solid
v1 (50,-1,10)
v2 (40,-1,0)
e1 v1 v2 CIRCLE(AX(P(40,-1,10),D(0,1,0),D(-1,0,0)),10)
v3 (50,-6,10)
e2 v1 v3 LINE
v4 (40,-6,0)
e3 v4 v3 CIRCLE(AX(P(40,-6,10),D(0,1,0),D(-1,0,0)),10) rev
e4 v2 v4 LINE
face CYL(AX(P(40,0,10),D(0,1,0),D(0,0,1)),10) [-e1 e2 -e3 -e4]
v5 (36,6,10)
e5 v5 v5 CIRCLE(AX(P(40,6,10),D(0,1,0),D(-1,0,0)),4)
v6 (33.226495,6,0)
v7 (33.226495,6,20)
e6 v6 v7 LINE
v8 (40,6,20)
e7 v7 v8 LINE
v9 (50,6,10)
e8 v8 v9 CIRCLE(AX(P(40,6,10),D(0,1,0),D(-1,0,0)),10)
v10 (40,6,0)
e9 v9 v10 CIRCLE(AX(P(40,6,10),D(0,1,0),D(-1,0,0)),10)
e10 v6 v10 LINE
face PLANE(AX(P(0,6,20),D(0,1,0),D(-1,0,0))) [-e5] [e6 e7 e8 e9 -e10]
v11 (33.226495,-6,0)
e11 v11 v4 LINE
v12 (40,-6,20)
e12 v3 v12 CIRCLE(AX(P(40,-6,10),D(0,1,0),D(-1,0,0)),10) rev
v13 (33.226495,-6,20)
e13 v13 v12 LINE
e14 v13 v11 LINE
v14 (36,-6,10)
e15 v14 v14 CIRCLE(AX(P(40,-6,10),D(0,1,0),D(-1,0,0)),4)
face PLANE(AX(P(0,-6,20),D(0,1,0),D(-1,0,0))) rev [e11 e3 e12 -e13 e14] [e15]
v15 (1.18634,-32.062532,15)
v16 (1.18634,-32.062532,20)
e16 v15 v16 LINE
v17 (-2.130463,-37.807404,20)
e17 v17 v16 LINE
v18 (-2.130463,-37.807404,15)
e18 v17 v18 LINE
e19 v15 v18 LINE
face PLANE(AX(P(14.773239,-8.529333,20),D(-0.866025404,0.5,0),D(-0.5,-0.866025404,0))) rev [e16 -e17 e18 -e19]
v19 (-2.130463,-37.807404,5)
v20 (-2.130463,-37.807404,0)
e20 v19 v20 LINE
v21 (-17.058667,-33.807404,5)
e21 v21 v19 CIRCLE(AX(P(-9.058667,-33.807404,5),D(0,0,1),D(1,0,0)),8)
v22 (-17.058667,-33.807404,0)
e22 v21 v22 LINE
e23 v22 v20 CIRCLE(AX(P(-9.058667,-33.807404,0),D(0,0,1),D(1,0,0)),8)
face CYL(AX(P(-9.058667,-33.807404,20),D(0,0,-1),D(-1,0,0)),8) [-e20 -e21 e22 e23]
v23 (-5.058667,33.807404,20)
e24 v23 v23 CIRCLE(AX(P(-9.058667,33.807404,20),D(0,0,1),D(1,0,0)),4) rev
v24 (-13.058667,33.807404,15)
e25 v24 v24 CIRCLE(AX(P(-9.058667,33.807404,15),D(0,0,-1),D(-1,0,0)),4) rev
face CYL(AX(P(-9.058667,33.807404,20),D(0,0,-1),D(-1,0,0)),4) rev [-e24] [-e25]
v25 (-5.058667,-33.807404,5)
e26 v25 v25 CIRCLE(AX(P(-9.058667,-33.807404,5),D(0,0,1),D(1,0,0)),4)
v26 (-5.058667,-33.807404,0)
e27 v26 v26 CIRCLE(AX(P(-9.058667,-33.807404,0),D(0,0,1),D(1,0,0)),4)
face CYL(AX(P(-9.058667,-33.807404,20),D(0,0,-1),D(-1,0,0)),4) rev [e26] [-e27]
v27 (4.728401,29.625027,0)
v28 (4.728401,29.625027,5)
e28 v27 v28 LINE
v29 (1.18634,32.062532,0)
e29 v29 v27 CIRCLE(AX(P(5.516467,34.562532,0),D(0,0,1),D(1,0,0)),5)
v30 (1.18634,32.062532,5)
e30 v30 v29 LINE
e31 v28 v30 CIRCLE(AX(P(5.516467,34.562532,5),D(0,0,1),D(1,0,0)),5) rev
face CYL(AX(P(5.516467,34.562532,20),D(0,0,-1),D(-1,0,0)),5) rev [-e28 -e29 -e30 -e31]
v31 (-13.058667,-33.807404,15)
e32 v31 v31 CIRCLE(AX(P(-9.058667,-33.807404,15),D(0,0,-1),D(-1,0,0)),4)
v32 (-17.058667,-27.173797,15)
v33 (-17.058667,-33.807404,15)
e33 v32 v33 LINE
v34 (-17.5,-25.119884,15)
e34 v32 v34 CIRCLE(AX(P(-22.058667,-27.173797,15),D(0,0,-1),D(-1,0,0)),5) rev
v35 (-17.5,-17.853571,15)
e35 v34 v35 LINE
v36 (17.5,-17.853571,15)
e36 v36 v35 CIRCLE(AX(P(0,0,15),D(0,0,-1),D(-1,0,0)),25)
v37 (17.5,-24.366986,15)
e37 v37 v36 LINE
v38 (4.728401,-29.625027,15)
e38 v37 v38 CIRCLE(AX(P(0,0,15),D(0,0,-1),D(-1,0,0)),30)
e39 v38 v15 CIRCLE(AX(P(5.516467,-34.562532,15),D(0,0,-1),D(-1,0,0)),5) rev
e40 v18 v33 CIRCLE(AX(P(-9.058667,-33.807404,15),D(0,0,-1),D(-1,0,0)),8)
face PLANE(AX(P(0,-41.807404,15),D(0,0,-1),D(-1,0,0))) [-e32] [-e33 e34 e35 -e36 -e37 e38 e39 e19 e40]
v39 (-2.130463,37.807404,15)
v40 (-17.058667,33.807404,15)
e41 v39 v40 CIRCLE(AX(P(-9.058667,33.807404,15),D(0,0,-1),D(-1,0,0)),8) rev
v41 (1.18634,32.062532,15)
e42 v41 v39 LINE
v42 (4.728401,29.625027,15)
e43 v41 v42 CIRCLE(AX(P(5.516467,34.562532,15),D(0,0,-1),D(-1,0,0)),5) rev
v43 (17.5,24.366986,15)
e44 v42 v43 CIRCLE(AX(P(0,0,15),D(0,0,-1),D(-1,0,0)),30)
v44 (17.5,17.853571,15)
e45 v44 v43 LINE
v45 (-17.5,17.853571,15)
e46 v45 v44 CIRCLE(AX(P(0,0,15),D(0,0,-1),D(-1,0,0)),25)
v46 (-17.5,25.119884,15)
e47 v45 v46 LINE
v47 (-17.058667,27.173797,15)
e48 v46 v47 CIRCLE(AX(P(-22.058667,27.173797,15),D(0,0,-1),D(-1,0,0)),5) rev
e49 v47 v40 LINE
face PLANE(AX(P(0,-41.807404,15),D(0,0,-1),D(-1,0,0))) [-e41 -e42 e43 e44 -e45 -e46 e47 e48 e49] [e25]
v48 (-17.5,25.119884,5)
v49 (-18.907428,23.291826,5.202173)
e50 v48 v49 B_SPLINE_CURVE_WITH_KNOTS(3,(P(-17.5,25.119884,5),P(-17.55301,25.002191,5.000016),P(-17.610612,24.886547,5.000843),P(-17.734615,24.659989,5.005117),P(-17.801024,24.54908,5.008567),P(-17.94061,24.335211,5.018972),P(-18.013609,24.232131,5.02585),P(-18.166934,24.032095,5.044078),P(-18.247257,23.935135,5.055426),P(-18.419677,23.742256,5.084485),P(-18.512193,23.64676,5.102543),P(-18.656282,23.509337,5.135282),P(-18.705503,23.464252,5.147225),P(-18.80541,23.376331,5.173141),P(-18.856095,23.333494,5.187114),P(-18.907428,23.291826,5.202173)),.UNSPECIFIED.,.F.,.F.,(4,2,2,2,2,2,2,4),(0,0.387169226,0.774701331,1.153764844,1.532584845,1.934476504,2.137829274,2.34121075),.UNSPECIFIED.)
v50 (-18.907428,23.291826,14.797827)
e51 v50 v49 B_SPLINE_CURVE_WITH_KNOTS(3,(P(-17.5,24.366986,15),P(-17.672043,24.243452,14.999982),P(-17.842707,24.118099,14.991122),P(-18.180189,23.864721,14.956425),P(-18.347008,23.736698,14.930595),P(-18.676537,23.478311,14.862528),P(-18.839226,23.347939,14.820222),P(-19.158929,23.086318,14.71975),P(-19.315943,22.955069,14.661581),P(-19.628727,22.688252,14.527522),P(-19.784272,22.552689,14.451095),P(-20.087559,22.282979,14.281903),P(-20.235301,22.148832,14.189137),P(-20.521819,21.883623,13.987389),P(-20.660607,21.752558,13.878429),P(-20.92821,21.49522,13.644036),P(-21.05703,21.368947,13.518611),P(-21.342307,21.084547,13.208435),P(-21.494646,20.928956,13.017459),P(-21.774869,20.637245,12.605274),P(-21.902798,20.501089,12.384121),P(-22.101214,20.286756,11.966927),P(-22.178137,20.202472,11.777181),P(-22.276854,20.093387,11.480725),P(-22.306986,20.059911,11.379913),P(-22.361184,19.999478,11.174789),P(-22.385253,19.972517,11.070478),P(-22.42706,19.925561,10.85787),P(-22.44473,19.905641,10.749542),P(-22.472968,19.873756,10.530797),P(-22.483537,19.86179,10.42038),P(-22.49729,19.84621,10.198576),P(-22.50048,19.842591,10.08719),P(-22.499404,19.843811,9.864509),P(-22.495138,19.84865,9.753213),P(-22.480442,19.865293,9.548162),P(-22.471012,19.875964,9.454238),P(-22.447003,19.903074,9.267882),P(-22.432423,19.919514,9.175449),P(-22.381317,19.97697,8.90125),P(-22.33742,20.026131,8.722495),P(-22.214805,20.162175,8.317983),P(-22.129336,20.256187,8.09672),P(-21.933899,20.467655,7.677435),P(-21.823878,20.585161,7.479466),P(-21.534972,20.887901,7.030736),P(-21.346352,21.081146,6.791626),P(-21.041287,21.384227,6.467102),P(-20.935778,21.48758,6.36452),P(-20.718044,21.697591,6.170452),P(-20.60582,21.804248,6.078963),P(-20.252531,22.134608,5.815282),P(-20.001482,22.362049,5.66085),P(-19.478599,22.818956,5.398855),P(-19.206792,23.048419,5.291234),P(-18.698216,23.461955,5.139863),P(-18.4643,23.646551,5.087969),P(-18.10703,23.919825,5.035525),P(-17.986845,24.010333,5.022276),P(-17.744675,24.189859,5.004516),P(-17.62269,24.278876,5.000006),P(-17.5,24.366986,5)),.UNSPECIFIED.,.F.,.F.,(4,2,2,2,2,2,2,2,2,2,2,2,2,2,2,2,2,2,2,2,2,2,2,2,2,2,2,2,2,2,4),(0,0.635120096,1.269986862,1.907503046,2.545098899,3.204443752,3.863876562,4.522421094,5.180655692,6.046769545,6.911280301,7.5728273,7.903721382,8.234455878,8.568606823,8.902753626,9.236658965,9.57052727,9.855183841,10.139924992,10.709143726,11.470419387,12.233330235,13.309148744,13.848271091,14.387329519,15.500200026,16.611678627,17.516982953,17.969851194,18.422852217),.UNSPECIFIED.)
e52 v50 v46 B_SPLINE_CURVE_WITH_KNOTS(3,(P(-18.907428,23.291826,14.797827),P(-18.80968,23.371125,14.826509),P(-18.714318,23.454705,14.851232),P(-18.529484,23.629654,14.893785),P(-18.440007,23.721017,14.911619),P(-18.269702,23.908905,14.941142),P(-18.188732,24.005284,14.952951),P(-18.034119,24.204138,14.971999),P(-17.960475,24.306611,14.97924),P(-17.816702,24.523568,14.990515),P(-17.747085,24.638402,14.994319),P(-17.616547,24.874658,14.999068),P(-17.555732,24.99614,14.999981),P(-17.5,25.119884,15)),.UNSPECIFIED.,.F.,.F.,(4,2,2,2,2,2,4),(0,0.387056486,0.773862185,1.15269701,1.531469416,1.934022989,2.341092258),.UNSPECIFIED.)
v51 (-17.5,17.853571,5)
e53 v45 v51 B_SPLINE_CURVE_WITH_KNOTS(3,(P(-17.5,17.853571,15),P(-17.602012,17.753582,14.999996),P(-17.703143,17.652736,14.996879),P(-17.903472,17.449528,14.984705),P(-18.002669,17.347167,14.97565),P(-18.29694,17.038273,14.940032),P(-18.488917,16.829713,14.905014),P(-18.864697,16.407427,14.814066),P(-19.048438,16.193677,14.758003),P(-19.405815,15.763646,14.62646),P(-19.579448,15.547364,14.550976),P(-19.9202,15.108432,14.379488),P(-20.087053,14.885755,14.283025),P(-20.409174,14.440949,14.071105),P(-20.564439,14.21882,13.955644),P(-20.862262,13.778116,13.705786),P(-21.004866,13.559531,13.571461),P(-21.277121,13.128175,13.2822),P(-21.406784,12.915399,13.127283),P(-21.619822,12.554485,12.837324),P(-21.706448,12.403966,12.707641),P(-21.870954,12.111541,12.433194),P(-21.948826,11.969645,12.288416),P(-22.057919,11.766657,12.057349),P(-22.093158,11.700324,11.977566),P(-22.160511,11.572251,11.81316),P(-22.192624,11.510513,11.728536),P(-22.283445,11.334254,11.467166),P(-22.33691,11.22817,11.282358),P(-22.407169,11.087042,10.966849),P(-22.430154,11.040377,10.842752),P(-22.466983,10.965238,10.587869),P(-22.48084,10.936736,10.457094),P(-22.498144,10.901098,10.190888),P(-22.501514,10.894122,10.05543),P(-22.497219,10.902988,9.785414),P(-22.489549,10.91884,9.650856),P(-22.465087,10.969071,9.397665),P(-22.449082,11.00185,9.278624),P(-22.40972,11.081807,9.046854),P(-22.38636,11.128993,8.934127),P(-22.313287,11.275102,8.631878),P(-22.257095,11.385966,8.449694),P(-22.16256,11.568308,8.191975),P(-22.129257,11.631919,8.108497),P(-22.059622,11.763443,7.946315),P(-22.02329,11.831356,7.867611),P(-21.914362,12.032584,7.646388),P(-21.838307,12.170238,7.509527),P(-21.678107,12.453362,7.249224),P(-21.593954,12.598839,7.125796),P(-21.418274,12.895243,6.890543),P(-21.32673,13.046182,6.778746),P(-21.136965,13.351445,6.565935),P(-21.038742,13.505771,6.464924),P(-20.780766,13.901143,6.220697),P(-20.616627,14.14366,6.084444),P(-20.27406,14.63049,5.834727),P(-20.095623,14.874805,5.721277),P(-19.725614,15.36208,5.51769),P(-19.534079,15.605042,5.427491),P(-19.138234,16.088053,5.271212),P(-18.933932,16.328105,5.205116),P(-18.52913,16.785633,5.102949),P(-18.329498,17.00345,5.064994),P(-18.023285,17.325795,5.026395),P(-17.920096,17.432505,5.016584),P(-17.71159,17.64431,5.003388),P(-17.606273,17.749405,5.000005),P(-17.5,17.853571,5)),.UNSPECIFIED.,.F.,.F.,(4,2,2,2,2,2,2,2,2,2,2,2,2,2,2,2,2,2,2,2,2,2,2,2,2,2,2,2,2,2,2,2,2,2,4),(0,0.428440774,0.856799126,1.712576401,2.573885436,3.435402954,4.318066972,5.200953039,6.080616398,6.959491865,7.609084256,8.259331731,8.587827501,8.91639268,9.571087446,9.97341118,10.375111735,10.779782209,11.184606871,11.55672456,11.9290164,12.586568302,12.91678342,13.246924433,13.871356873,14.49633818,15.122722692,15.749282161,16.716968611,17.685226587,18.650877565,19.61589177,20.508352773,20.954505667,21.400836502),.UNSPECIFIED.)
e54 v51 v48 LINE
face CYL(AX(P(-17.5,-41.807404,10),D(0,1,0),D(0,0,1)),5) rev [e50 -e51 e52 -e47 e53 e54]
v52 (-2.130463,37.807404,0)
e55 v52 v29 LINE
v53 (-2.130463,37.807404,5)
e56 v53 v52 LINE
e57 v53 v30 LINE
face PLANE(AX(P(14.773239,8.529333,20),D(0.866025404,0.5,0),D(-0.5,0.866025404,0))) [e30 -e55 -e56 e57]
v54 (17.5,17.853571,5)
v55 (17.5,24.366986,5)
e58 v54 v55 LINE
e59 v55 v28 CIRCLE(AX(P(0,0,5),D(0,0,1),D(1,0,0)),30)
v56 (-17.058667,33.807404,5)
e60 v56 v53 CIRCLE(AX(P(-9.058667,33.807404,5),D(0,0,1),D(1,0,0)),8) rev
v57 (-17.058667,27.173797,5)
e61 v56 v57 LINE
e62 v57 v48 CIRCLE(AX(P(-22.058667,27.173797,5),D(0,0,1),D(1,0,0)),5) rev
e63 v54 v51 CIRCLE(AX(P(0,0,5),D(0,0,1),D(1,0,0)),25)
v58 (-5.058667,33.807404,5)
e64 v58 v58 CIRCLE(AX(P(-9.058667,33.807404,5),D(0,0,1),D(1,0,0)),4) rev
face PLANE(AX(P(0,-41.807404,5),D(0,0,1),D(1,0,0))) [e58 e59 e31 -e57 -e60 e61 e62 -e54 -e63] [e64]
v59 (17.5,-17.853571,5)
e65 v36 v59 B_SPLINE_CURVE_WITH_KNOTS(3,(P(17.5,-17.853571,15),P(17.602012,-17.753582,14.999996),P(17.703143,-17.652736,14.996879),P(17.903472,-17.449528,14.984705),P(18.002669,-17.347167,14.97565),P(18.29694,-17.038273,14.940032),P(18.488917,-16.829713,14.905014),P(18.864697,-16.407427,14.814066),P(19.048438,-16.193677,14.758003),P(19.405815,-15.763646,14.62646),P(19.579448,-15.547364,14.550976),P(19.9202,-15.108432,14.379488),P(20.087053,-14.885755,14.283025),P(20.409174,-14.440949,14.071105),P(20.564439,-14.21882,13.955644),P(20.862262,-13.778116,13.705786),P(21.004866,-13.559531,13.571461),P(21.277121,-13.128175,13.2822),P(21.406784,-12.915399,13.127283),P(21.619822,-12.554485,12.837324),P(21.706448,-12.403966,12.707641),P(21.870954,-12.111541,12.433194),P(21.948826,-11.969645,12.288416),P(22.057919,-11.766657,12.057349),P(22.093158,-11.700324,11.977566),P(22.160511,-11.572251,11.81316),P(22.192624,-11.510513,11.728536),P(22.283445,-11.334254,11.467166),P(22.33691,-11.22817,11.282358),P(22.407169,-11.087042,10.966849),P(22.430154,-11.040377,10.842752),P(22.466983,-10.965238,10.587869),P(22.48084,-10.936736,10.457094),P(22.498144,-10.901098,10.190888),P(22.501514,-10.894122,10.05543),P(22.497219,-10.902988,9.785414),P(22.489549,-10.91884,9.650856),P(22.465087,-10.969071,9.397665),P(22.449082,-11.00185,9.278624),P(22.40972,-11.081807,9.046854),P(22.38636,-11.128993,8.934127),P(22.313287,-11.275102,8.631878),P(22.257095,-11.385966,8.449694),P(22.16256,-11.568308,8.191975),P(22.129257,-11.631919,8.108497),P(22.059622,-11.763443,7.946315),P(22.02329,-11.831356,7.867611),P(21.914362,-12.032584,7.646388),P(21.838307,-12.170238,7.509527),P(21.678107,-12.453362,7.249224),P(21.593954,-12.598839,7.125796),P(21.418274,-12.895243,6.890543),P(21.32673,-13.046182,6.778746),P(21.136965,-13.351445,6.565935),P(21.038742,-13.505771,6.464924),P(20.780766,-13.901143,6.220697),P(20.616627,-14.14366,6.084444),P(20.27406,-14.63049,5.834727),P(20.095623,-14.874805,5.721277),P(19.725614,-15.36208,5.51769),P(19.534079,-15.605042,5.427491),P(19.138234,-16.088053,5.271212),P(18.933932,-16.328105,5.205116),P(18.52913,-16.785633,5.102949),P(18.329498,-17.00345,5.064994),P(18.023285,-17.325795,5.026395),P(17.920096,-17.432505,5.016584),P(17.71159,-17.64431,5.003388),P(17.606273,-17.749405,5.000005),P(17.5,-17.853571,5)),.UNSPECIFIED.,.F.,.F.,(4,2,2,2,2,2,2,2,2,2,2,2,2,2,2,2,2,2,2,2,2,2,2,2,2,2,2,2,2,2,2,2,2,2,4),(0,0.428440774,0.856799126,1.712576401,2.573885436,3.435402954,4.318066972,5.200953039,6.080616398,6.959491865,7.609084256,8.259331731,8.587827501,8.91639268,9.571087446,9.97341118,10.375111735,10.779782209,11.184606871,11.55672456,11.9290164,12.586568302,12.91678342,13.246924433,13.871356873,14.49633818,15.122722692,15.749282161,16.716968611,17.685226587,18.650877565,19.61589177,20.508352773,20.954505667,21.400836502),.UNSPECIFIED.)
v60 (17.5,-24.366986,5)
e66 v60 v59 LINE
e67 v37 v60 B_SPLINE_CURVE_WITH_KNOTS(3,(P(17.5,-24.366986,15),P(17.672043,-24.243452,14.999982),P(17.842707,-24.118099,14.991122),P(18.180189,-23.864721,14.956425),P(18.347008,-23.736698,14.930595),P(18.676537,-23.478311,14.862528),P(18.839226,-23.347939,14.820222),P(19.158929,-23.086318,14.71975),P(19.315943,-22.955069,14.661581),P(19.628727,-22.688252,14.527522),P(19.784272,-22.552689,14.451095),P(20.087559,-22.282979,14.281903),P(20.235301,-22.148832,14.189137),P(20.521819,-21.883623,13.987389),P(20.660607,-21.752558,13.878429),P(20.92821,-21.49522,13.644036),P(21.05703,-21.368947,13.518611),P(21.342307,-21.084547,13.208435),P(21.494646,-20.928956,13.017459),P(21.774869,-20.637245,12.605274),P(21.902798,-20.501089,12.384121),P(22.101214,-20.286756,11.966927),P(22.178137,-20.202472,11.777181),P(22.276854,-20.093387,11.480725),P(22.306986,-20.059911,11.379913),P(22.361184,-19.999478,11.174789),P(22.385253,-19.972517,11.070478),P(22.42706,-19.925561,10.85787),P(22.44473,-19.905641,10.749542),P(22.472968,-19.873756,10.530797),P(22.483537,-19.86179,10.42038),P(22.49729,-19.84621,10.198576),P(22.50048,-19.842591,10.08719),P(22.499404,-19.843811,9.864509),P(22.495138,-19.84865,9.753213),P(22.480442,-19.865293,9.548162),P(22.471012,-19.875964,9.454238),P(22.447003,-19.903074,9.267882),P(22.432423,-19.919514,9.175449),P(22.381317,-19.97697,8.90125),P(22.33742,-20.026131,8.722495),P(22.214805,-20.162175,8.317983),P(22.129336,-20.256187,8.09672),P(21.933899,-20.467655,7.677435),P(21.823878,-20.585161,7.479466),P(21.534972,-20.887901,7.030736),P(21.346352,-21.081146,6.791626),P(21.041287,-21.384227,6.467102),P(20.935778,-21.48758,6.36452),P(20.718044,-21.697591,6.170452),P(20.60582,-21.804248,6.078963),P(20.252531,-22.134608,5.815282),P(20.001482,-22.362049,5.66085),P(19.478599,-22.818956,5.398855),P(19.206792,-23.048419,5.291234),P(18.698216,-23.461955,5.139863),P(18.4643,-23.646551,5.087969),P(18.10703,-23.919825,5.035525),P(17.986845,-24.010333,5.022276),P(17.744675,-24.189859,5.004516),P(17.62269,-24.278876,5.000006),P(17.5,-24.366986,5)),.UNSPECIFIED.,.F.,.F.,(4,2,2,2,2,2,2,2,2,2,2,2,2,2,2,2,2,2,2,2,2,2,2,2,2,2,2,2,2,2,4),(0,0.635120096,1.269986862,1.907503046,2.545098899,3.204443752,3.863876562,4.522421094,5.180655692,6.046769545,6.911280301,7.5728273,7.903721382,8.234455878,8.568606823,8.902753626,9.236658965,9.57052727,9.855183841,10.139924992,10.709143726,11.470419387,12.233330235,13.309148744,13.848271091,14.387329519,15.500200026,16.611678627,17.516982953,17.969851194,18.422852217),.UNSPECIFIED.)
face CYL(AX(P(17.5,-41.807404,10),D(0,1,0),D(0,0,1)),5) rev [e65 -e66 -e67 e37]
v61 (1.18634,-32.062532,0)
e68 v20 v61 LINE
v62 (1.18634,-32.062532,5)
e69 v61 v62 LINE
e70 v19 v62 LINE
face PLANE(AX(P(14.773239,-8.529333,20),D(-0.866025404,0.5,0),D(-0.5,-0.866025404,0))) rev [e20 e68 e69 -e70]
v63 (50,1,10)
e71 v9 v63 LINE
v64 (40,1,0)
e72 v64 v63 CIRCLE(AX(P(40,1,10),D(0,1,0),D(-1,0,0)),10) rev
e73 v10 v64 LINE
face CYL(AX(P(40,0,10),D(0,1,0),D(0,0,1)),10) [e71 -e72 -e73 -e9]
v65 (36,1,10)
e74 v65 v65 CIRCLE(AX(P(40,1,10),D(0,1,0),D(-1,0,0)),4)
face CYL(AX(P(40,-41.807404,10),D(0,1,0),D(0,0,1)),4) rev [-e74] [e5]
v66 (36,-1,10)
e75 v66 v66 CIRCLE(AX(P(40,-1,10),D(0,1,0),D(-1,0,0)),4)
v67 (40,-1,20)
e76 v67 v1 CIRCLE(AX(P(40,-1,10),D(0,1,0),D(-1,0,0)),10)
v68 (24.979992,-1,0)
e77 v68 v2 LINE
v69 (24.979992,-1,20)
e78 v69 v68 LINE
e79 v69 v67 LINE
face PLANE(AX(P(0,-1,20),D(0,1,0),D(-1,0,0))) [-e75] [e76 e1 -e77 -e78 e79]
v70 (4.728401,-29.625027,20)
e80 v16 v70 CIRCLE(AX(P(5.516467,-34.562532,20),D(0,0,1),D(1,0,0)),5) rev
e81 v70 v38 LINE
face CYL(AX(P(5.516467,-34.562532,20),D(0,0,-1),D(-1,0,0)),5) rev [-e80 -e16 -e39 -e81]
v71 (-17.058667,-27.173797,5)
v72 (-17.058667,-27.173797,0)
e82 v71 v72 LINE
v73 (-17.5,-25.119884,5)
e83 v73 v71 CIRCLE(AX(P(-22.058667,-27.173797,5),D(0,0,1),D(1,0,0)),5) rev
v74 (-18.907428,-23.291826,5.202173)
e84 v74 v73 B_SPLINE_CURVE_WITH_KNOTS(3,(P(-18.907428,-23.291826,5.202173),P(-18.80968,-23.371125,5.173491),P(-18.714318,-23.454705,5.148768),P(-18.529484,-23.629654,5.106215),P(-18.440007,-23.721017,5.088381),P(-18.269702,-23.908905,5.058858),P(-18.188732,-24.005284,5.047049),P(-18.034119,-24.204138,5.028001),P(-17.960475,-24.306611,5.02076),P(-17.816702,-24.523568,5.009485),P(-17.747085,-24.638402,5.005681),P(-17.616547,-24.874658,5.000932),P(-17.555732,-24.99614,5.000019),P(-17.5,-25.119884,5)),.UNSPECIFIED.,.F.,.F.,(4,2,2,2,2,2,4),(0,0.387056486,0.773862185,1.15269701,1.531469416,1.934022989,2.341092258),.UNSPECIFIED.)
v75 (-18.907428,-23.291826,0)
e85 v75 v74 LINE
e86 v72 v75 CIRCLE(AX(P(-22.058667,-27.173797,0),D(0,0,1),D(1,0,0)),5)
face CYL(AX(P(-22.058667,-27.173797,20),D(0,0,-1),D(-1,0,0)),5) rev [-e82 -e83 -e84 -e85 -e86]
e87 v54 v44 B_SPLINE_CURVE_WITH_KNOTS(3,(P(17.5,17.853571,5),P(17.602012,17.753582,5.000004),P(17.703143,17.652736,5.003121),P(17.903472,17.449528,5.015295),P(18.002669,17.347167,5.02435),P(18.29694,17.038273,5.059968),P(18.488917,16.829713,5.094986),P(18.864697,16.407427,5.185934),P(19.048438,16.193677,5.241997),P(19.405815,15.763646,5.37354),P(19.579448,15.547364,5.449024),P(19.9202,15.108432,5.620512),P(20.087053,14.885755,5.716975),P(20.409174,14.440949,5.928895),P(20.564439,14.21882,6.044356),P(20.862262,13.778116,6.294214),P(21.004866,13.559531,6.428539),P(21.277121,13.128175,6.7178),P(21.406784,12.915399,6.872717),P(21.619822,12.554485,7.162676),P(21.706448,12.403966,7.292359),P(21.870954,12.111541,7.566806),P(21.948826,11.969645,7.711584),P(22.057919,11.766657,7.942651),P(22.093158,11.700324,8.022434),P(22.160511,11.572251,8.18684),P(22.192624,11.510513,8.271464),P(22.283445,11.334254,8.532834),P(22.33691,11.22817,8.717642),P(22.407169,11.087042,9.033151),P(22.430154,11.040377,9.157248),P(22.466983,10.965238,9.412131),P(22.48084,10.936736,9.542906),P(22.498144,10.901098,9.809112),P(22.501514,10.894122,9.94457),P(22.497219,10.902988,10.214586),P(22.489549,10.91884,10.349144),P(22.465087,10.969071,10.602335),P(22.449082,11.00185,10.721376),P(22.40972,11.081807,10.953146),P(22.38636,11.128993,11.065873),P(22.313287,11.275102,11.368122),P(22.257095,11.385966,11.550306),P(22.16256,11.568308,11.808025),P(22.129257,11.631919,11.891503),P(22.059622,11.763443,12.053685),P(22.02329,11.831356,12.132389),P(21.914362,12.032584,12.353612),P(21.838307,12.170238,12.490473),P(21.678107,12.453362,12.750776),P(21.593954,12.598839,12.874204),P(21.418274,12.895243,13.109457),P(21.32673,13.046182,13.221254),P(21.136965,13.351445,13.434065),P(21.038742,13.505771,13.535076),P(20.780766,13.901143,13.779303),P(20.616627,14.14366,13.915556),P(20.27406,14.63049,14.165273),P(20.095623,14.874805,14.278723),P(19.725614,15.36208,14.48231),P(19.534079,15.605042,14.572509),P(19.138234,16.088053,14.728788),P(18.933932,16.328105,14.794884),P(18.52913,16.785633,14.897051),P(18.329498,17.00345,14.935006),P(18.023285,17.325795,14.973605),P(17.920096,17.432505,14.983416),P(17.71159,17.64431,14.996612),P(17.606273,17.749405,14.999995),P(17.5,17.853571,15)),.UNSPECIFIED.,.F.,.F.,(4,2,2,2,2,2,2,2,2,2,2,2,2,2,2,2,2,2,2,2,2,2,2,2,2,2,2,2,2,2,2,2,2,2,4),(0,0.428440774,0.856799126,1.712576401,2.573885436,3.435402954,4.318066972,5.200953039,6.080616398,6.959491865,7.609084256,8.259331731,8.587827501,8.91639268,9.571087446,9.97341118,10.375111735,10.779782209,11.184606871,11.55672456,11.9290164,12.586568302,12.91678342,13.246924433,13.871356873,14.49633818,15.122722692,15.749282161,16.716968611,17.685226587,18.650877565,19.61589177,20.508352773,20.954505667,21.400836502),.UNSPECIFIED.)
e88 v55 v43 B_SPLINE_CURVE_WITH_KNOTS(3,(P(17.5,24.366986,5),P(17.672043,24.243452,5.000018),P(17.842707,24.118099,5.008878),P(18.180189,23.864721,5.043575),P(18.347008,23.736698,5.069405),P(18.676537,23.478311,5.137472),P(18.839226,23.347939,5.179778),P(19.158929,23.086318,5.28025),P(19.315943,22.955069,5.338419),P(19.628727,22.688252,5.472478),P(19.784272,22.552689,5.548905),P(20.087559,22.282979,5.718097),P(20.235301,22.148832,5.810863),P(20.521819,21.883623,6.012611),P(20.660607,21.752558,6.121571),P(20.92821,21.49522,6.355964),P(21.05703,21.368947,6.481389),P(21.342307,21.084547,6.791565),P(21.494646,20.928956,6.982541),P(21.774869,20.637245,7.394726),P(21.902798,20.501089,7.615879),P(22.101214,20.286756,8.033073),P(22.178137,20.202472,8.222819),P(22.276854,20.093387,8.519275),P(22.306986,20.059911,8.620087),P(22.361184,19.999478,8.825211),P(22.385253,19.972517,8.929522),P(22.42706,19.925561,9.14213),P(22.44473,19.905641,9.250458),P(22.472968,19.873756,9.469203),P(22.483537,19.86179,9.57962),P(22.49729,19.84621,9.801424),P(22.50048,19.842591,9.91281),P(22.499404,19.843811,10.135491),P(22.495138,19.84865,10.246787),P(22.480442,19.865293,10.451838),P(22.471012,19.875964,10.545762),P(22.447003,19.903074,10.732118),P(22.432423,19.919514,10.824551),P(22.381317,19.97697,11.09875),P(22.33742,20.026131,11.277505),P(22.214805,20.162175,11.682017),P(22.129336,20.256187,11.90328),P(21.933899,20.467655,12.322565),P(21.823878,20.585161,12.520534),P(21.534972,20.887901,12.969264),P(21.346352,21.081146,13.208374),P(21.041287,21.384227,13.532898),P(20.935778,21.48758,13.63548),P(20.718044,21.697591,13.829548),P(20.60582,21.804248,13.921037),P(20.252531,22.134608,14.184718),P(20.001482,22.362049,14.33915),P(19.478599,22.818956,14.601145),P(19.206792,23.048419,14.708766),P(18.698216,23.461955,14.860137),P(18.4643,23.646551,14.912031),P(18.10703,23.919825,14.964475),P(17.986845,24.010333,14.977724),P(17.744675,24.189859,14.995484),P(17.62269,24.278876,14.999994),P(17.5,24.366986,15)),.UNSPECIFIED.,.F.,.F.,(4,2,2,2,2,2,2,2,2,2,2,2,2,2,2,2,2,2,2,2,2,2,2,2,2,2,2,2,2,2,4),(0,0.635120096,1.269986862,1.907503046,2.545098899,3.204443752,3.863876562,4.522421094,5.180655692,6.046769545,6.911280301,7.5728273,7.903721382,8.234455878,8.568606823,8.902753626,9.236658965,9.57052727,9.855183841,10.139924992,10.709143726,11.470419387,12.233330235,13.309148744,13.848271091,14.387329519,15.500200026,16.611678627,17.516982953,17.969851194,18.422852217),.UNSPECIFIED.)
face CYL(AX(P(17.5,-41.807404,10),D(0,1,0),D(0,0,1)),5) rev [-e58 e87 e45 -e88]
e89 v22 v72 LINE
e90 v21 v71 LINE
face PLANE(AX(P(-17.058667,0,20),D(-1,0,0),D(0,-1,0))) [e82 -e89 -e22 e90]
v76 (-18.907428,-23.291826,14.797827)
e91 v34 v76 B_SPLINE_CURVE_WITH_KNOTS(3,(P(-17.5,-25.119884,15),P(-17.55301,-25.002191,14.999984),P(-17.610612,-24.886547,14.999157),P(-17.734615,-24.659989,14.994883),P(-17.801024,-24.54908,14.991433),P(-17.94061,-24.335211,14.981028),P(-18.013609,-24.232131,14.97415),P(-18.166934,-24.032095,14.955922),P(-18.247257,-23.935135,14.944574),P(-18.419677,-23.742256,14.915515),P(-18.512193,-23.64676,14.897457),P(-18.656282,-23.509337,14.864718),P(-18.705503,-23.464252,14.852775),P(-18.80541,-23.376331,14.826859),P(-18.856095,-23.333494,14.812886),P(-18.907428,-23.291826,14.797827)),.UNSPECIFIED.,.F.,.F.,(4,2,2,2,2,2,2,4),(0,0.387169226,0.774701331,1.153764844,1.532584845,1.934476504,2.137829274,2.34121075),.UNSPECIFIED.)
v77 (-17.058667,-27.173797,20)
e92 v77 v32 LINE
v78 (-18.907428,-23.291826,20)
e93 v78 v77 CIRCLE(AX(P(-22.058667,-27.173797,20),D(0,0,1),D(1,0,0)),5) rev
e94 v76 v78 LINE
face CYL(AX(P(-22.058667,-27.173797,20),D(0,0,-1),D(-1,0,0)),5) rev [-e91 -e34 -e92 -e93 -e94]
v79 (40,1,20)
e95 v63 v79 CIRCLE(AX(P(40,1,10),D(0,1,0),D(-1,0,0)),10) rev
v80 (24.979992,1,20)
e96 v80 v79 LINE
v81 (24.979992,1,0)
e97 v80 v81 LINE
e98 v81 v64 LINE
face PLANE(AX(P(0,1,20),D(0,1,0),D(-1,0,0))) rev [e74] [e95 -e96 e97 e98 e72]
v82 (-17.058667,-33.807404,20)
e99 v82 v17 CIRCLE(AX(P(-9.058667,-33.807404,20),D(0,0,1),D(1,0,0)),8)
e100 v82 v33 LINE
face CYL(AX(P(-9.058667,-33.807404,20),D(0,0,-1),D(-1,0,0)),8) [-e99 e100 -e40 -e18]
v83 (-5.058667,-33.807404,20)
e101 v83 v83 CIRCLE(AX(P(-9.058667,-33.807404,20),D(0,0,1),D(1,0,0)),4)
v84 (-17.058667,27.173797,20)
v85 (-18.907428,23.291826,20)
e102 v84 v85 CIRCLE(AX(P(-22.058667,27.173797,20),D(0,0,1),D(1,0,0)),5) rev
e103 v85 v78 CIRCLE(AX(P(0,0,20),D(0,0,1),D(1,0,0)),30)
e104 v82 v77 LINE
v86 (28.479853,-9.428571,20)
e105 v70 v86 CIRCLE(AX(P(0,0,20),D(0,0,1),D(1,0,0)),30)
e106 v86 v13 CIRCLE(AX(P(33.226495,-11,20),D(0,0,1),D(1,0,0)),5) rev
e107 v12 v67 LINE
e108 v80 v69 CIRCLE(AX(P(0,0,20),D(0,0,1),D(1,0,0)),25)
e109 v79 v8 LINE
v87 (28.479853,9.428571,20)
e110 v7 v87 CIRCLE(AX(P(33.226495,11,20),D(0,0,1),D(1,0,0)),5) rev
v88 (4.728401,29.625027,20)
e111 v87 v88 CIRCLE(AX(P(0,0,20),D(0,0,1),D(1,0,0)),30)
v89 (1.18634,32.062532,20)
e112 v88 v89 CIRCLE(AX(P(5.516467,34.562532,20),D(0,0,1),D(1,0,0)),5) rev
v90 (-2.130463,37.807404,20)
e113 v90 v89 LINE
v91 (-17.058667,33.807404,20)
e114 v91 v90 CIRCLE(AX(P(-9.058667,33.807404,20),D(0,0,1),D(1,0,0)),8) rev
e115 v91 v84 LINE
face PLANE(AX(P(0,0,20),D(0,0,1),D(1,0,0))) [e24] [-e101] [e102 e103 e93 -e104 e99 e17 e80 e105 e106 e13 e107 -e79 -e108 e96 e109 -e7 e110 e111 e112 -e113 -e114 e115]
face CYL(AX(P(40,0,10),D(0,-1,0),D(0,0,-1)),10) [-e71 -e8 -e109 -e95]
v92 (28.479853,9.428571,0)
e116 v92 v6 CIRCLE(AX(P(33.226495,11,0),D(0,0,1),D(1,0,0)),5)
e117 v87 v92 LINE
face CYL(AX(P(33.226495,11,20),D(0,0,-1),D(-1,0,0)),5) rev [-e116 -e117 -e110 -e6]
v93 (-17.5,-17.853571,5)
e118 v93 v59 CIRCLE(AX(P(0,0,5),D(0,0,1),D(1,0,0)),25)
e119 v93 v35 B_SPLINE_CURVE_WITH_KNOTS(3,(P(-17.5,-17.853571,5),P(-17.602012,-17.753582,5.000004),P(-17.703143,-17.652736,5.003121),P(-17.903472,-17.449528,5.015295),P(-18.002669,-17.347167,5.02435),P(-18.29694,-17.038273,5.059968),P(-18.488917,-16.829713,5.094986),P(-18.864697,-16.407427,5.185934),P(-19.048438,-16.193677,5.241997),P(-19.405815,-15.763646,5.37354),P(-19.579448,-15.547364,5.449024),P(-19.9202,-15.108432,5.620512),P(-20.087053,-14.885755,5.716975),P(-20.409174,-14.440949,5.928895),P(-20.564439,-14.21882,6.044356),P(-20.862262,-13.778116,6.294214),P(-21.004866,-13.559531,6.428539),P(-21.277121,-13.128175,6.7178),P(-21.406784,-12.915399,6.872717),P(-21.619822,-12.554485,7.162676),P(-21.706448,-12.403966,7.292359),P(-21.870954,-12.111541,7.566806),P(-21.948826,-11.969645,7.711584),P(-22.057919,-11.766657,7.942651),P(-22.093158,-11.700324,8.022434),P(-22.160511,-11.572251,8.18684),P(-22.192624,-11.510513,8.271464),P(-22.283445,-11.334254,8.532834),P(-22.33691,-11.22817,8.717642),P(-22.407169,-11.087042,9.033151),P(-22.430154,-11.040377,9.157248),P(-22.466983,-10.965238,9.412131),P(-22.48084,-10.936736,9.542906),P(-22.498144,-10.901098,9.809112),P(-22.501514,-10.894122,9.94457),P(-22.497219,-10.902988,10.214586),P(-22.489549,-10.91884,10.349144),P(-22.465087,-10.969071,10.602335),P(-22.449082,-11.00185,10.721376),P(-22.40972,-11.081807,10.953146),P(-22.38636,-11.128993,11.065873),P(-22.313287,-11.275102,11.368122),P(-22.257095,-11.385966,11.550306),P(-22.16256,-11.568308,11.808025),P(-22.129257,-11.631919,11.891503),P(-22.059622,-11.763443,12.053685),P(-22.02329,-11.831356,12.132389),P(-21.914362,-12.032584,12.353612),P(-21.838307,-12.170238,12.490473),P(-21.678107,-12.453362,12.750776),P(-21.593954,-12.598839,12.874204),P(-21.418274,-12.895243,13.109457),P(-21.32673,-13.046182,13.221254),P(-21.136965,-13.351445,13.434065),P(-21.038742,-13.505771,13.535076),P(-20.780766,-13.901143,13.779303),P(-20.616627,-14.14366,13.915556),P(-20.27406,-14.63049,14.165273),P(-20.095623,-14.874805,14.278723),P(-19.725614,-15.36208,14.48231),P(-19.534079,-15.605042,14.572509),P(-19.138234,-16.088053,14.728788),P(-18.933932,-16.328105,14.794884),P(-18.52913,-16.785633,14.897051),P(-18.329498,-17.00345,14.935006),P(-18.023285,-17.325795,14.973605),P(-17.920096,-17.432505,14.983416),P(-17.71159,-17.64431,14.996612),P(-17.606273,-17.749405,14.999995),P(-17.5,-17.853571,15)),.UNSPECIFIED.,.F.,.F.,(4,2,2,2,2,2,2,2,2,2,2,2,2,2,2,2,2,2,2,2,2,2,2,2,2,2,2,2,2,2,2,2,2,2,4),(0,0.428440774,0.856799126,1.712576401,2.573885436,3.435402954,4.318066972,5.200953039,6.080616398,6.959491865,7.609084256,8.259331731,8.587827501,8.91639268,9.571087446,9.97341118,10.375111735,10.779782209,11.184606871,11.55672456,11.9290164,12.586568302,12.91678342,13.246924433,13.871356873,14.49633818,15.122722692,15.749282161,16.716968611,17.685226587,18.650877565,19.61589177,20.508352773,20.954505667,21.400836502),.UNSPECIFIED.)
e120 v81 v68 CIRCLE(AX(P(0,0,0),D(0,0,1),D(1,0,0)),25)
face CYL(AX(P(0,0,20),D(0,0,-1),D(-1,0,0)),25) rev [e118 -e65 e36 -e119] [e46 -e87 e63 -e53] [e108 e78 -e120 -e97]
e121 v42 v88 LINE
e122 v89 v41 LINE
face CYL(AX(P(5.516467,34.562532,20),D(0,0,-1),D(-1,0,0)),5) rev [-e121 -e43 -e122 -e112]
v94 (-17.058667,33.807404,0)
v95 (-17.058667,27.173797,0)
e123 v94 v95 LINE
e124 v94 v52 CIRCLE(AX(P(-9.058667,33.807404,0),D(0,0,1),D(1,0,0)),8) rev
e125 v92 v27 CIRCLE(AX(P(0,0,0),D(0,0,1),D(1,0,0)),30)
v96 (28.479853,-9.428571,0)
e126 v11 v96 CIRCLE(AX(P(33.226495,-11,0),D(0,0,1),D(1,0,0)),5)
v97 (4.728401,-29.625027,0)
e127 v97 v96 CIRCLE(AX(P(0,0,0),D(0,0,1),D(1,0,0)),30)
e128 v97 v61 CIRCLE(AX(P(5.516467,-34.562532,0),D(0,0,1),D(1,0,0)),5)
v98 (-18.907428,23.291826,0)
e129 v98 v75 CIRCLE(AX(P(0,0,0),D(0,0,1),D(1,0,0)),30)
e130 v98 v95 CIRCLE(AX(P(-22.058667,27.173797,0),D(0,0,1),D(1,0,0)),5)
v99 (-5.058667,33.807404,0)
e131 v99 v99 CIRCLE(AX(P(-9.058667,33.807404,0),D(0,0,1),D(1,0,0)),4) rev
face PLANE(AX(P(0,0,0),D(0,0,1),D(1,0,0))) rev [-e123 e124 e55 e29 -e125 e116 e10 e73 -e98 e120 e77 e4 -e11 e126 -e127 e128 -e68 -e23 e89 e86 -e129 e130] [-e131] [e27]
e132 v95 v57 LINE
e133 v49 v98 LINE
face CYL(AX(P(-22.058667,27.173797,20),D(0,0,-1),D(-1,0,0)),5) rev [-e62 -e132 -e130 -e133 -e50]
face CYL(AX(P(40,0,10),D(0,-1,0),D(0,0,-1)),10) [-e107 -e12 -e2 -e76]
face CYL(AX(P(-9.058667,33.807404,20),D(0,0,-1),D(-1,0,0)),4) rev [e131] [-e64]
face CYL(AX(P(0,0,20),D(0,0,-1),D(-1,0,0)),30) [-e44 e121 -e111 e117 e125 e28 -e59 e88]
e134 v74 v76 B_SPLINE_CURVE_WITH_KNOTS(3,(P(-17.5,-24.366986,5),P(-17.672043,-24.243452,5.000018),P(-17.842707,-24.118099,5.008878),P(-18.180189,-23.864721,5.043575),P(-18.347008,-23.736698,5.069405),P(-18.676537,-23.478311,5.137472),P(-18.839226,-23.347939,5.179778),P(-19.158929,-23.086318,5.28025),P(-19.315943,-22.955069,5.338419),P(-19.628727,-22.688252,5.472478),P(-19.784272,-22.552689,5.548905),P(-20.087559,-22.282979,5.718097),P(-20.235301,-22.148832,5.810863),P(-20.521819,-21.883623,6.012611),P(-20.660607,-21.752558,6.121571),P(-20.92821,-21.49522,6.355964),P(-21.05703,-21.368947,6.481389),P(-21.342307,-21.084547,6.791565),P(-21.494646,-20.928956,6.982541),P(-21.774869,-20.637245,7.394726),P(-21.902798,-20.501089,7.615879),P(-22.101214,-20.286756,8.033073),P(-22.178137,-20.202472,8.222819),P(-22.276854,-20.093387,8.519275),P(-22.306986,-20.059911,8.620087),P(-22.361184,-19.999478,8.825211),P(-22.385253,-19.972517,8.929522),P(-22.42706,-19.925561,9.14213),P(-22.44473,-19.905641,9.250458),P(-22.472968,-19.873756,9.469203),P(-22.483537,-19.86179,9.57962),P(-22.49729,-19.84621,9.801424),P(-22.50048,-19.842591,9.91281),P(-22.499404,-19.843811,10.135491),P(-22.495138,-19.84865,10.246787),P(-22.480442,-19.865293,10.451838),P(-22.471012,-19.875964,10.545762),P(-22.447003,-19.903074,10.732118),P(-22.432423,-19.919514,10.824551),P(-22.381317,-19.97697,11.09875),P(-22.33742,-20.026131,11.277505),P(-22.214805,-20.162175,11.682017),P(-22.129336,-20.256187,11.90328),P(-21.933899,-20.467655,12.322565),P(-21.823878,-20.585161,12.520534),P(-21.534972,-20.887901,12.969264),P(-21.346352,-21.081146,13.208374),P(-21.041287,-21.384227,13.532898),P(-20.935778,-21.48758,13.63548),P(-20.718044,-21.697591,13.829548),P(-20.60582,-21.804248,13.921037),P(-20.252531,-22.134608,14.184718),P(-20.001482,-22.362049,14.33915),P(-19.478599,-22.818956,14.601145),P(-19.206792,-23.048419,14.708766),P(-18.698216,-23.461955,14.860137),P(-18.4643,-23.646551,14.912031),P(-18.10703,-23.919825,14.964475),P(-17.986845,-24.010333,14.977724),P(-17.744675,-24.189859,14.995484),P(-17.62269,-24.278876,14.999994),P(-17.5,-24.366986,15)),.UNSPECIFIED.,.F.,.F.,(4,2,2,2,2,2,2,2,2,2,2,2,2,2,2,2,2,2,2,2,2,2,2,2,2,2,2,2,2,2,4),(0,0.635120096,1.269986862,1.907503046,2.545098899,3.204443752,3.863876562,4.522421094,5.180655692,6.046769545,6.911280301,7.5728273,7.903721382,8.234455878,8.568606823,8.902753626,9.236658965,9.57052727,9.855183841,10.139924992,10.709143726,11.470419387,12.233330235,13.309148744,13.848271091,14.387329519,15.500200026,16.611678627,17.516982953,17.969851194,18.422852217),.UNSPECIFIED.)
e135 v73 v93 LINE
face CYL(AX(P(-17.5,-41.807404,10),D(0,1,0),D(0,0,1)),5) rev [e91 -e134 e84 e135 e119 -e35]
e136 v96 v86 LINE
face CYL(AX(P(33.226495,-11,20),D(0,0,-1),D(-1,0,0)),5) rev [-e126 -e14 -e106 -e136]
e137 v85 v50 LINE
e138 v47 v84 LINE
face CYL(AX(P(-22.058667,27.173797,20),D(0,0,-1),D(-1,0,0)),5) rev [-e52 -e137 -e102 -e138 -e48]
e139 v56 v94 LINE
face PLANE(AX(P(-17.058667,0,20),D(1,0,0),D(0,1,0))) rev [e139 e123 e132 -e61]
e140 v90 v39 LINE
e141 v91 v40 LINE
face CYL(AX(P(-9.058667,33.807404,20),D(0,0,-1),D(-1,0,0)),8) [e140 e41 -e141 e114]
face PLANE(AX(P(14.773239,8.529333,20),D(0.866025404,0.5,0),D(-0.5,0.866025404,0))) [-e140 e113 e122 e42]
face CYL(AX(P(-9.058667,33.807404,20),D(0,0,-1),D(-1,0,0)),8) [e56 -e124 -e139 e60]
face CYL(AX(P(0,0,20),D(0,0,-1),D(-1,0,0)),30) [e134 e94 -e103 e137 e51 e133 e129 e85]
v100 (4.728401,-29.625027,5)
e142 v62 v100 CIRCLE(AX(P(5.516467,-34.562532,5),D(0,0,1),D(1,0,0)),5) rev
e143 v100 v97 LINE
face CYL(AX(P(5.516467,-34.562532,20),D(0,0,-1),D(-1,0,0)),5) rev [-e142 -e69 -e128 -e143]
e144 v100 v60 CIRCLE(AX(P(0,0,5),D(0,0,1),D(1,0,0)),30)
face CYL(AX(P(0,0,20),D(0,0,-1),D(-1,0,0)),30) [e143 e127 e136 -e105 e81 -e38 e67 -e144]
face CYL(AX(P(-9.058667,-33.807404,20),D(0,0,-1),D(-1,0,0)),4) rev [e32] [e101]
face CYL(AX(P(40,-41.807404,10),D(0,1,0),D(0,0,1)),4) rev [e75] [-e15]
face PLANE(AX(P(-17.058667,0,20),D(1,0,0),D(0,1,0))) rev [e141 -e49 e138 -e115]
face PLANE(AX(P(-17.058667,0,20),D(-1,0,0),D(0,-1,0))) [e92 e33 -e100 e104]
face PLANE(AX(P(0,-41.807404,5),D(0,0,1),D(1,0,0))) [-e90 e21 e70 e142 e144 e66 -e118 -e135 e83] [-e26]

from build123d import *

# Parameters (mm, degrees)
SKETCH1_R              = 4
BOSS_EXTRUDE1_DEPTH    = 20
FILLET1_R              = 10
CUT_EXTRUDE1_START     = -41.80740392
CUT_EXTRUDE1_OUTLINE_R = 4
CUT_EXTRUDE1_DEPTH     = 83.61480784
FILLET2_R              = 5


# Read off the part's stored shape, not the designer's step: Cut-Extrude1
with BuildPart() as part:
    # Sketch1 → Boss-Extrude1 (new body)
    with BuildSketch(Plane(origin=(0, 0, 0), x_dir=(0, 1, 0), z_dir=(0, 0, 1))):
        with BuildLine():
            ThreePointArc((24.677963744, 17.058666579), (0, 30), (-24.677963744, 17.058666579))
            Line((-24.677963744, 17.058666579), (-33.80740392, 17.058666579))
            ThreePointArc((-33.80740392, 17.058666579), (-41.534810495, 11.129219073), (-37.80740416, 2.130463487))
            Line((-37.80740416, 2.130463487), (-29.901076805, -2.43425674))
            ThreePointArc((-29.901076805, -2.43425674), (-22.448320849, -19.901580115), (-6, -29.393876913))
            Line((-6, -29.393876913), (-6, -50))
            Line((-6, -50), (-1, -50))
            Line((-1, -50), (-1, -24.979991994))
            ThreePointArc((-1, -24.979991994), (0, 25), (1, -24.979991994))
            Line((1, -24.979991994), (1, -50))
            Line((1, -50), (6, -50))
            Line((6, -50), (6, -29.393876913))
            ThreePointArc((6, -29.393876913), (22.448320849, -19.901580115), (29.901076805, -2.43425674))
            Line((29.901076805, -2.43425674), (37.807403702, 2.130463222))
            ThreePointArc((37.807403702, 2.130463222), (41.534810563, 11.129218818), (33.80740392, 17.058666579))
            Line((33.80740392, 17.058666579), (24.677963744, 17.058666579))
        make_face()
        with Locations(Location((-33.80740392, 9.058666579, 0), (0, 0, 270))):
            Circle(SKETCH1_R, mode=Mode.SUBTRACT)
        with Locations(Location((33.80740392, 9.058666579, 0), (0, 0, 270))):
            Circle(SKETCH1_R, mode=Mode.SUBTRACT)
    extrude(amount=BOSS_EXTRUDE1_DEPTH)

    # Fillet1
    fillet1_edges = [part.edges().sort_by_distance(p)[0] for p in [
        (50, 3.5, 0),
        (50, 3.5, 20),
        (50, -3.5, 0),
        (50, -3.5, 20),
    ]]
    fillet(fillet1_edges, radius=FILLET1_R - 0.0001)  # a hair under: the kernel refuses the full size

    # Cut-Extrude1 outline → Cut-Extrude1 (cut)
    with BuildSketch(Plane(origin=(0, 0, 0), x_dir=(-1, 0, 0), z_dir=(0, 1, 0)).offset(CUT_EXTRUDE1_START)):
        with BuildLine():
            ThreePointArc((17.5, 5), (22.5, 10), (17.5, 15))
            Line((17.5, 15), (-17.5, 15))
            ThreePointArc((-17.5, 15), (-22.5, 10), (-17.5, 5))
            Line((-17.5, 5), (17.5, 5))
        make_face()
        with Locations((-40, 10)):
            Circle(CUT_EXTRUDE1_OUTLINE_R)
    extrude(amount=CUT_EXTRUDE1_DEPTH, mode=Mode.SUBTRACT)

    # Fillet2
    fillet2_edges = [part.edges().sort_by_distance(p)[0] for p in [
        (29.393876913, -6, 10),
        (2.43425674, -29.901076805, 17.5),
        (2.43425674, -29.901076805, 2.5),
        (-17.058666579, -24.677963744, 17.5),
        (-17.058666579, -24.677963744, 2.5),
        (-17.058666579, 24.677963744, 17.5),
        (-17.058666579, 24.677963744, 2.5),
        (2.43425674, 29.901076805, 2.5),
        (2.43425674, 29.901076805, 17.5),
        (29.393876913, 6, 10),
    ]]
    fillet(fillet2_edges, radius=FILLET2_R)


solid = part.part
